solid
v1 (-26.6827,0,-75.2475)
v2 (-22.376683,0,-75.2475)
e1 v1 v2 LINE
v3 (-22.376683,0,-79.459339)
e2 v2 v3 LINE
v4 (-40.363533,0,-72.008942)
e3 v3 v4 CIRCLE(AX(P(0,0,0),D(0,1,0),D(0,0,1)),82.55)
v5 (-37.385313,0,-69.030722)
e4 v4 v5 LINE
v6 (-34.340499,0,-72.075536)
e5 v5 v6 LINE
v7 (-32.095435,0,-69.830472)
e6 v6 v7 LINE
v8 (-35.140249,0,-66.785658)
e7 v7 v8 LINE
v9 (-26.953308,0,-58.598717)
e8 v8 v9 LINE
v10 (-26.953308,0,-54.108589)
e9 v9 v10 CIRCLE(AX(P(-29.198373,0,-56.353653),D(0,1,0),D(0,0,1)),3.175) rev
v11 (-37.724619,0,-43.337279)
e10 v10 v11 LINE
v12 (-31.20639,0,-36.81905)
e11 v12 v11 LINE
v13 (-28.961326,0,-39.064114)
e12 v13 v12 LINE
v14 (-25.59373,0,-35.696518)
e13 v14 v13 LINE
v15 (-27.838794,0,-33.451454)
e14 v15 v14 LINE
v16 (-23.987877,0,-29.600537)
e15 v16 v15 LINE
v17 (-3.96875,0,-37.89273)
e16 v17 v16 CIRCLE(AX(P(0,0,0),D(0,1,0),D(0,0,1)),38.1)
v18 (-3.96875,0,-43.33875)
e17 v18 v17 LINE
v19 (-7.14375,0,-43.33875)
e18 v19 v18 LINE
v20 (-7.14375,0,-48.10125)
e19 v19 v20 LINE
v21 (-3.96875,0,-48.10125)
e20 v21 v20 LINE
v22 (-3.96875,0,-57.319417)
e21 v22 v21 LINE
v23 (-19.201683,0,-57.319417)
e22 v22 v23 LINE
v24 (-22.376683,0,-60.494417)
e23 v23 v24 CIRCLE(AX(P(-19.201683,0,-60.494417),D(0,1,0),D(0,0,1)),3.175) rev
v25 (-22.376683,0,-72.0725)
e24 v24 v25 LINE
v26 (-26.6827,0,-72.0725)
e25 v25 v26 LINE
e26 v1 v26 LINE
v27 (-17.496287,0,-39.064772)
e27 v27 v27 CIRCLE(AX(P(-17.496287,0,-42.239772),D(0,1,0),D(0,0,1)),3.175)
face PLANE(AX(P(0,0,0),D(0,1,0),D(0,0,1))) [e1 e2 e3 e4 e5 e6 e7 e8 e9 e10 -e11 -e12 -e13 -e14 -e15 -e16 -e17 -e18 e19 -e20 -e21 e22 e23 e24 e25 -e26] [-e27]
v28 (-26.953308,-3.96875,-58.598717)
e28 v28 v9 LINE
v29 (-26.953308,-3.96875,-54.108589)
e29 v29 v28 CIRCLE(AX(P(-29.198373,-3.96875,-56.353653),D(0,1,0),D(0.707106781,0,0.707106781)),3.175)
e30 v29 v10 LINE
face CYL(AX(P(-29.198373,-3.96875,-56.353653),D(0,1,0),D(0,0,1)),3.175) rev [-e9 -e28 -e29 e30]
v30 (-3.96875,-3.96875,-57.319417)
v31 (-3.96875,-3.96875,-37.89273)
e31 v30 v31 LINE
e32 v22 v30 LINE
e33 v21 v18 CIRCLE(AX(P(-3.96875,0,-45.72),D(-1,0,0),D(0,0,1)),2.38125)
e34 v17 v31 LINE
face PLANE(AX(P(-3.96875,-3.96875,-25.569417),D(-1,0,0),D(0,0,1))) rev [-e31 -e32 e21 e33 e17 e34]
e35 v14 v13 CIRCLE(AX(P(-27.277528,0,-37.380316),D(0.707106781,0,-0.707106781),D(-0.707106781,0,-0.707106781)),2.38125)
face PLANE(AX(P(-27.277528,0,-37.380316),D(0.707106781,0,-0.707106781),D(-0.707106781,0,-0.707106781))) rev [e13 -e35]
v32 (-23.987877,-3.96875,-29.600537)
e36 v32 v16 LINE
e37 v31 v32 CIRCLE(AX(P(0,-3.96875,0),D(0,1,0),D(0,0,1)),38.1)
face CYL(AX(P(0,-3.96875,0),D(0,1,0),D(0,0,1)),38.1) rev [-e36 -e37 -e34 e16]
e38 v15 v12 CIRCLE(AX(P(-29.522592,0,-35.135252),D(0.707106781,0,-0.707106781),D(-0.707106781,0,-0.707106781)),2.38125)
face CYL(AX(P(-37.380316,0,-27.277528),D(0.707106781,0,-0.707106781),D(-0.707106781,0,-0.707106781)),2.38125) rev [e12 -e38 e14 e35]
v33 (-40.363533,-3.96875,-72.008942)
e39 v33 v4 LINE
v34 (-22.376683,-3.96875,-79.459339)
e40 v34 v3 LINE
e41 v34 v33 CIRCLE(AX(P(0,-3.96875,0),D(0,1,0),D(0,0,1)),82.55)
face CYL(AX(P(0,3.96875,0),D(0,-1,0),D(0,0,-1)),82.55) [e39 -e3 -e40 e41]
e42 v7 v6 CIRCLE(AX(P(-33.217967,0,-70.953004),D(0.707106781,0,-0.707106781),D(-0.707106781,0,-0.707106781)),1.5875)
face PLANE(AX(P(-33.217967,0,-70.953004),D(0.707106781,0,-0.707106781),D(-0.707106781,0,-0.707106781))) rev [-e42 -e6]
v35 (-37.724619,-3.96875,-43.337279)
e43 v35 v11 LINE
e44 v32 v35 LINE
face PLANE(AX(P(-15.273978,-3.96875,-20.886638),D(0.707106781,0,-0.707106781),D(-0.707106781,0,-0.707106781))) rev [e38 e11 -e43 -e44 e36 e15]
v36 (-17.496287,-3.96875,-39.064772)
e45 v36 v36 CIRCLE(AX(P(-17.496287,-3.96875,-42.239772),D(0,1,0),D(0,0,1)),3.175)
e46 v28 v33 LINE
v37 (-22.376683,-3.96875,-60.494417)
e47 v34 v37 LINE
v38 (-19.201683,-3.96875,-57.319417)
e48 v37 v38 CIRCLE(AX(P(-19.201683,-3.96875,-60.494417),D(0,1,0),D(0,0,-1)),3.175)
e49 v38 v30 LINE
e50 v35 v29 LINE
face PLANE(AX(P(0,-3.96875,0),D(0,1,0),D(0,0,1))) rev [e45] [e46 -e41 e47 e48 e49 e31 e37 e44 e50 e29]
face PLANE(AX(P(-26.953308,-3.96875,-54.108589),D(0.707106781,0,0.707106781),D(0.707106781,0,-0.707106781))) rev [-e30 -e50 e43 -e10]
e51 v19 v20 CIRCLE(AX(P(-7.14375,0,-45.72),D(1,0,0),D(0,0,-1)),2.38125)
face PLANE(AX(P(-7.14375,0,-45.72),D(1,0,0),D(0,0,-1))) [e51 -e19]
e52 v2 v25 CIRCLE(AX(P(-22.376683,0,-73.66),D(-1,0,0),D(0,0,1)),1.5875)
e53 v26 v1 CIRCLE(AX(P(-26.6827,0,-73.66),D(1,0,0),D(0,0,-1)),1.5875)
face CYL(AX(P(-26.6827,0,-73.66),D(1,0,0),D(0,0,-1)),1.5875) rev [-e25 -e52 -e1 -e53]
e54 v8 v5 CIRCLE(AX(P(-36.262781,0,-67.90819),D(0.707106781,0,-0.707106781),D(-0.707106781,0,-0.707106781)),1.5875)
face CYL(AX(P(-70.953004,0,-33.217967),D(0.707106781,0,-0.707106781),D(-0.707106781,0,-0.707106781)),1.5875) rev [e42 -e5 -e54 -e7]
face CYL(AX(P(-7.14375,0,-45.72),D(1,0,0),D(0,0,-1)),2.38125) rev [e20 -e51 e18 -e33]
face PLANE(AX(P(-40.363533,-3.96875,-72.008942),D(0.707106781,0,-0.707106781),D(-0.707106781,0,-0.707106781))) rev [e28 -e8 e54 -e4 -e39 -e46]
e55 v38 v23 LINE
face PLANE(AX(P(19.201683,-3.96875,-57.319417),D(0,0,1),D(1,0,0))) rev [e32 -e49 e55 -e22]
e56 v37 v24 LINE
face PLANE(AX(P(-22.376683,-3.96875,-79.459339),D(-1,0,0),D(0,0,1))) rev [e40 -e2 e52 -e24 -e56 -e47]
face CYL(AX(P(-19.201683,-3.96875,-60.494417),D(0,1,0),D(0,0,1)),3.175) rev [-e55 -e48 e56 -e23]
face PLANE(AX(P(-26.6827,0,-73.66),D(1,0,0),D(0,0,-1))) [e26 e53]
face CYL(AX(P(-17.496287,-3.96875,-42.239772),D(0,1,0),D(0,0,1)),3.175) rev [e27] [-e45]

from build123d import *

# Parameters (mm, degrees)
SKETCH1_R                   = 82.55
BASE_EXTRUDE_DEPTH          = 3.96875
WHEEL_SHAPE_CUT_DEPTH       = 117.810769951
RELIEF_FILLET_R             = 3.175
TOLERANCE_CUT_DEPTH         = 117.810769951
CUT_START                   = -3.96875
CUT_PATTERN_DEPTH           = 7.9375
SKETCH3_R                   = 1.5875
WHEEL_AXLE_CUT_DEPTH        = 26.6827
WHEEL_AXLE_PATTERN_COUNT    = 8
SKETCH5_R                   = 82.55
SHELL_CUT_DEPTH             = 113.442536881
SKETCH7_W                   = 7.9375
SKETCH7_H                   = 63.330582695
IDLER_CUT_DEPTH             = 113.442536881
SKETCH9_R                   = 2.38125
IDLER_AXLE_CUT_DEPTH        = 7.14375
IDLER_PATTERN_COUNT         = 8
MAIN_GEAR_CUT_DEPTH         = 113.442536881
MAIN_GEAR_CUT_DEPTH_BACK    = 113.442536881
SKETCH8_R                   = 38.1
SCREW_ACCESS_CUT_DEPTH      = 113.442536881
SCREW_ACCESS_CUT_DEPTH_BACK = 113.442536881
SKETCH17_R                  = 3.175


# Read off the part's stored shape, not the designer's step: Cut Pattern
with BuildPart() as part:
    # Sketch1 → Base Extrude (new, symmetric)
    with BuildSketch(Plane(origin=(0, 0, 0), x_dir=(1, 0, 0), z_dir=(0, 1, 0))):
        with Locations(Location((0, 0, 0), (0, 0, 270))):
            Circle(SKETCH1_R)
    extrude(amount=BASE_EXTRUDE_DEPTH, both=True)

    # Sketch2 → Wheel Shape Cut (cut, symmetric)
    with BuildSketch(Plane(origin=(0, 0, 0), x_dir=(1, 0, 0), z_dir=(0, 1, 0))):
        with BuildLine():
            Line((-21.919482915, 86.15536123), (-21.919482915, 61.16463877))
            ThreePointArc((-21.919482915, 61.16463877), (0, 58.42), (21.919482915, 61.16463877))
            Line((21.919482915, 61.16463877), (21.919482915, 86.15536123))
            ThreePointArc((21.919482915, 86.15536123), (0, 88.9), (-21.919482915, 86.15536123))
        make_face()
    extrude(amount=WHEEL_SHAPE_CUT_DEPTH, both=True, mode=Mode.SUBTRACT)

    # Relief Fillet
    relief_fillet_edges = [part.edges().sort_by_distance(p)[0] for p in [
        (-21.919482915, 0, -61.16463877),
        (21.919482915, 0, -61.16463877),
    ]]
    fillet(relief_fillet_edges, radius=RELIEF_FILLET_R)

    # Sketch16 → Tolerance Cut (cut, symmetric)
    with BuildSketch(Plane(origin=(0, 0, 0), x_dir=(1, 0, 0), z_dir=(0, 1, 0))):
        with BuildLine():
            Line((19.201682915, 57.319417305), (-19.201682915, 57.319417305))
            ThreePointArc((-19.201682915, 57.319417305), (-21.446746945, 58.249353274), (-22.376682915, 60.494417305))
            Line((-22.376682915, 60.494417305), (-22.376682915, 79.459339047))
            ThreePointArc((-22.376682915, 79.459339047), (-22.148174425, 79.523335378), (-21.919482915, 79.586674568))
            Line((-21.919482915, 79.586674568), (-21.919482915, 63.669417305))
            ThreePointArc((-21.919482915, 63.669417305), (-21.222873253, 61.684925851), (-19.438723023, 60.571247575))
            ThreePointArc((-19.438723023, 60.571247575), (0, 58.42), (19.438723023, 60.571247575))
            ThreePointArc((19.438723023, 60.571247575), (21.222873253, 61.684925851), (21.919482915, 63.669417305))
            Line((21.919482915, 63.669417305), (21.919482915, 79.586674568))
            ThreePointArc((21.919482915, 79.586674568), (22.148174425, 79.523335378), (22.376682915, 79.459339047))
            Line((22.376682915, 79.459339047), (22.376682915, 60.494417305))
            ThreePointArc((22.376682915, 60.494417305), (21.446746945, 58.249353274), (19.201682915, 57.319417305))
        make_face()
    extrude(amount=TOLERANCE_CUT_DEPTH, both=True, mode=Mode.SUBTRACT)

    # Cut Pattern outline → Cut Pattern (cut)
    with BuildSketch(Plane(origin=(0, 0, 0), x_dir=(1, 0, 0), z_dir=(0, 1, 0)).offset(CUT_START)):
        with BuildLine():
            ThreePointArc((-19.201682915, -57.319417305), (-21.446746945, -58.249353275), (-22.376682915, -60.494417305))
            Line((-22.376682915, -60.494417305), (-22.376682915, -79.459339047))
            ThreePointArc((-22.376682915, -79.459339047), (0, -82.55), (22.376682915, -79.459339047))
            Line((22.376682915, -79.459339047), (22.376682915, -60.494417305))
            ThreePointArc((22.376682915, -60.494417305), (21.446746945, -58.249353275), (19.201682915, -57.319417305))
            Line((19.201682915, -57.319417305), (-19.201682915, -57.319417305))
        make_face()
        with BuildLine():
            Line((58.598716929, 26.953308471), (72.008941698, 40.363533239))
            ThreePointArc((72.008941698, 40.363533239), (58.371664787, 58.371664787), (40.363533239, 72.008941698))
            Line((40.363533239, 72.008941698), (26.953308471, 58.598716929))
            ThreePointArc((26.953308471, 58.598716929), (26.023372501, 56.353652899), (26.953308471, 54.108588869))
            Line((26.953308471, 54.108588869), (54.108588869, 26.953308471))
            ThreePointArc((54.108588869, 26.953308471), (56.353652899, 26.023372501), (58.598716929, 26.953308471))
        make_face()
        with BuildLine():
            Line((60.494417305, -22.376682915), (79.459339047, -22.376682915))
            ThreePointArc((79.459339047, -22.376682915), (82.55, 0), (79.459339047, 22.376682915))
            Line((79.459339047, 22.376682915), (60.494417305, 22.376682915))
            ThreePointArc((60.494417305, 22.376682915), (58.249353275, 21.446746945), (57.319417305, 19.201682915))
            Line((57.319417305, 19.201682915), (57.319417305, -19.201682915))
            ThreePointArc((57.319417305, -19.201682915), (58.249353275, -21.446746945), (60.494417305, -22.376682915))
        make_face()
        with BuildLine():
            Line((26.953308471, -58.598716929), (40.363533239, -72.008941698))
            ThreePointArc((40.363533239, -72.008941698), (58.371664787, -58.371664787), (72.008941698, -40.363533239))
            Line((72.008941698, -40.363533239), (58.598716929, -26.953308471))
            ThreePointArc((58.598716929, -26.953308471), (56.353652899, -26.023372501), (54.108588869, -26.953308471))
            Line((54.108588869, -26.953308471), (26.953308471, -54.108588869))
            ThreePointArc((26.953308471, -54.108588869), (26.023372501, -56.353652899), (26.953308471, -58.598716929))
        make_face()
        with BuildLine():
            ThreePointArc((-40.363533239, 72.008941698), (-58.371664787, 58.371664787), (-72.008941698, 40.363533239))
            Line((-72.008941698, 40.363533239), (-58.598716929, 26.953308471))
            ThreePointArc((-58.598716929, 26.953308471), (-56.353652899, 26.023372501), (-54.108588869, 26.953308471))
            Line((-54.108588869, 26.953308471), (-26.953308471, 54.108588869))
            ThreePointArc((-26.953308471, 54.108588869), (-26.023372501, 56.353652899), (-26.953308471, 58.598716929))
            Line((-26.953308471, 58.598716929), (-40.363533239, 72.008941698))
        make_face()
        with BuildLine():
            ThreePointArc((-79.459339047, 22.376682915), (-82.55, 0), (-79.459339047, -22.376682915))
            Line((-79.459339047, -22.376682915), (-60.494417305, -22.376682915))
            ThreePointArc((-60.494417305, -22.376682915), (-58.249353275, -21.446746945), (-57.319417305, -19.201682915))
            Line((-57.319417305, -19.201682915), (-57.319417305, 19.201682915))
            ThreePointArc((-57.319417305, 19.201682915), (-58.249353275, 21.446746945), (-60.494417305, 22.376682915))
            Line((-60.494417305, 22.376682915), (-79.459339047, 22.376682915))
        make_face()
        with BuildLine():
            ThreePointArc((-72.008941698, -40.363533239), (-58.371664787, -58.371664787), (-40.363533239, -72.008941698))
            Line((-40.363533239, -72.008941698), (-26.953308471, -58.598716929))
            ThreePointArc((-26.953308471, -58.598716929), (-26.023372501, -56.353652899), (-26.953308471, -54.108588869))
            Line((-26.953308471, -54.108588869), (-54.108588869, -26.953308471))
            ThreePointArc((-54.108588869, -26.953308471), (-56.353652899, -26.023372501), (-58.598716929, -26.953308471))
            Line((-58.598716929, -26.953308471), (-72.008941698, -40.363533239))
        make_face()
    extrude(amount=CUT_PATTERN_DEPTH, mode=Mode.SUBTRACT)

    # Sketch3 → Wheel Axle Cut (cut, symmetric)
    with BuildSketch(Plane(origin=(0, 0, 0), x_dir=(0, 0, -1), z_dir=(1, 0, 0))):
        with Locations((73.66, 0)):
            Circle(SKETCH3_R)
    wheel_axle_cut = extrude(amount=WHEEL_AXLE_CUT_DEPTH, both=True, mode=Mode.SUBTRACT)

    # Wheel Axle Pattern: Wheel Axle Cut ×8 about axis
    wheel_axle_pattern_axis = Axis((0, 0, 0), (0, 1, 0))
    for i in range(1, WHEEL_AXLE_PATTERN_COUNT):
        add(wheel_axle_cut.rotate(wheel_axle_pattern_axis, i * 360 / WHEEL_AXLE_PATTERN_COUNT), mode=Mode.SUBTRACT)

    # Sketch5 → Shell Cut (cut, through all)
    with BuildSketch(Plane(origin=(0, 0, 0), x_dir=(1, 0, 0), z_dir=(0, 1, 0))):
        Circle(SKETCH5_R)
    extrude(amount=SHELL_CUT_DEPTH, mode=Mode.SUBTRACT)

    # Sketch7 → Idler Cut (cut, symmetric)
    with BuildSketch(Plane(origin=(0, 0, 0), x_dir=(1, 0, 0), z_dir=(0, 1, 0))):
        with Locations((0, 57.234708653)):
            Rectangle(SKETCH7_W, SKETCH7_H)
    idler_cut = extrude(amount=IDLER_CUT_DEPTH, both=True, mode=Mode.SUBTRACT)

    # Sketch9 → Idler Axle Cut (cut, symmetric)
    with BuildSketch(Plane(origin=(0, 0, 0), x_dir=(0, 0, -1), z_dir=(1, 0, 0))):
        with Locations((45.72, 0)):
            Circle(SKETCH9_R)
    idler_axle_cut = extrude(amount=IDLER_AXLE_CUT_DEPTH, both=True, mode=Mode.SUBTRACT)

    # Idler Pattern: Idler Cut, Idler Axle Cut ×8 about axis
    idler_pattern_axis = Axis((0, 0, 0), (0, 1, 0))
    add([idler_cut.rotate(idler_pattern_axis, i * 360 / IDLER_PATTERN_COUNT) for i in range(1, IDLER_PATTERN_COUNT)], mode=Mode.SUBTRACT)
    add([idler_axle_cut.rotate(idler_pattern_axis, i * 360 / IDLER_PATTERN_COUNT) for i in range(1, IDLER_PATTERN_COUNT)], mode=Mode.SUBTRACT)

    # Sketch8 → Main Gear Cut (cut, two sides: drawn at the far end of the back side and taken through both)
    with BuildSketch(Plane(origin=(0, 0, 0), x_dir=(1, 0, 0), z_dir=(0, 1, 0)).offset(-MAIN_GEAR_CUT_DEPTH_BACK)):
        Circle(SKETCH8_R)
    extrude(amount=MAIN_GEAR_CUT_DEPTH + MAIN_GEAR_CUT_DEPTH_BACK, mode=Mode.SUBTRACT)


with BuildPart() as main_gear_cut_piece_1:
    # of the separate pieces the step leaves, piece 1, a body of its own (main_gear_cut_pieces)
    add(part.part.solids().sort_by_distance((-3.96875, 0, 43.33875))[0])


with BuildPart() as main_gear_cut_piece_2:
    # of the separate pieces the step leaves, piece 2, a body of its own (main_gear_cut_pieces)
    add(part.part.solids().sort_by_distance((79.459339047, 0, -22.376682915))[0])


with BuildPart() as main_gear_cut_piece_3:
    # of the separate pieces the step leaves, piece 3, a body of its own (main_gear_cut_pieces)
    add(part.part.solids().sort_by_distance((43.33875, 0, 3.96875))[0])


with BuildPart() as main_gear_cut_piece_4:
    # of the separate pieces the step leaves, piece 4, a body of its own (main_gear_cut_pieces)
    add(part.part.solids().sort_by_distance((-22.376682915, 0, -60.494417305))[0])


with BuildPart() as main_gear_cut_piece_5:
    # of the separate pieces the step leaves, piece 5, a body of its own (main_gear_cut_pieces)
    add(part.part.solids().sort_by_distance((23.987876644, 0, -29.60053672))[0])


with BuildPart() as main_gear_cut_piece_6:
    # of the separate pieces the step leaves, piece 6, a body of its own (main_gear_cut_pieces)
    add(part.part.solids().sort_by_distance((-29.60053672, 0, -23.987876644))[0])


with BuildPart() as main_gear_cut_piece_7:
    # of the separate pieces the step leaves, piece 7, a body of its own (main_gear_cut_pieces)
    add(part.part.solids().sort_by_distance((-33.451454051, 0, 27.838793975))[0])


with BuildPart() as main_gear_cut_piece_8:
    # of the separate pieces the step leaves, piece 8, a body of its own (main_gear_cut_pieces)
    add(part.part.solids().sort_by_distance((27.838793975, 0, 33.451454051))[0])


with BuildPart() as screw_access_cut_tool:
    # Sketch17 → Screw Access Cut (new, two sides: drawn at the far end of the back side and taken through both)
    with BuildSketch(Plane(origin=(0, 0, 0), x_dir=(1, 0, 0), z_dir=(0, 1, 0)).offset(-SCREW_ACCESS_CUT_DEPTH_BACK)):
        with Locations(Location((-17.496286528, 42.239772226, 0), (0, 0, 270))):
            Circle(SKETCH17_R)
        with Locations(Location((17.496286528, 42.239772226, 0), (0, 0, 270))):
            Circle(SKETCH17_R)
        with Locations(Location((42.239772226, 17.496286528, 0), (0, 0, 270))):
            Circle(SKETCH17_R)
        with Locations(Location((42.239772226, -17.496286528, 0), (0, 0, 270))):
            Circle(SKETCH17_R)
        with Locations(Location((17.496286528, -42.239772226, 0), (0, 0, 270))):
            Circle(SKETCH17_R)
        with Locations(Location((-17.496286528, -42.239772226, 0), (0, 0, 270))):
            Circle(SKETCH17_R)
        with Locations(Location((-42.239772226, -17.496286528, 0), (0, 0, 270))):
            Circle(SKETCH17_R)
        with Locations(Location((-42.239772226, 17.496286528, 0), (0, 0, 270))):
            Circle(SKETCH17_R)
    extrude(amount=SCREW_ACCESS_CUT_DEPTH + SCREW_ACCESS_CUT_DEPTH_BACK)


with BuildPart() as main_gear_cut_piece_1_1:
    add(main_gear_cut_piece_1.part)

    # Screw Access Cut: cut by screw_access_cut_tool
    add(screw_access_cut_tool.part, mode=Mode.SUBTRACT)


with BuildPart() as main_gear_cut_piece_2_1:
    add(main_gear_cut_piece_2.part)

    # Screw Access Cut: cut by screw_access_cut_tool
    add(screw_access_cut_tool.part, mode=Mode.SUBTRACT)


with BuildPart() as main_gear_cut_piece_3_1:
    add(main_gear_cut_piece_3.part)

    # Screw Access Cut: cut by screw_access_cut_tool
    add(screw_access_cut_tool.part, mode=Mode.SUBTRACT)


with BuildPart() as main_gear_cut_piece_4_1:
    add(main_gear_cut_piece_4.part)

    # Screw Access Cut: cut by screw_access_cut_tool
    add(screw_access_cut_tool.part, mode=Mode.SUBTRACT)


with BuildPart() as main_gear_cut_piece_5_1:
    add(main_gear_cut_piece_5.part)

    # Screw Access Cut: cut by screw_access_cut_tool
    add(screw_access_cut_tool.part, mode=Mode.SUBTRACT)


with BuildPart() as main_gear_cut_piece_6_1:
    add(main_gear_cut_piece_6.part)

    # Screw Access Cut: cut by screw_access_cut_tool
    add(screw_access_cut_tool.part, mode=Mode.SUBTRACT)


with BuildPart() as main_gear_cut_piece_7_1:
    add(main_gear_cut_piece_7.part)

    # Screw Access Cut: cut by screw_access_cut_tool
    add(screw_access_cut_tool.part, mode=Mode.SUBTRACT)


with BuildPart() as main_gear_cut_piece_8_1:
    add(main_gear_cut_piece_8.part)

    # Screw Access Cut: cut by screw_access_cut_tool
    add(screw_access_cut_tool.part, mode=Mode.SUBTRACT)


solid = main_gear_cut_piece_4_1.part
